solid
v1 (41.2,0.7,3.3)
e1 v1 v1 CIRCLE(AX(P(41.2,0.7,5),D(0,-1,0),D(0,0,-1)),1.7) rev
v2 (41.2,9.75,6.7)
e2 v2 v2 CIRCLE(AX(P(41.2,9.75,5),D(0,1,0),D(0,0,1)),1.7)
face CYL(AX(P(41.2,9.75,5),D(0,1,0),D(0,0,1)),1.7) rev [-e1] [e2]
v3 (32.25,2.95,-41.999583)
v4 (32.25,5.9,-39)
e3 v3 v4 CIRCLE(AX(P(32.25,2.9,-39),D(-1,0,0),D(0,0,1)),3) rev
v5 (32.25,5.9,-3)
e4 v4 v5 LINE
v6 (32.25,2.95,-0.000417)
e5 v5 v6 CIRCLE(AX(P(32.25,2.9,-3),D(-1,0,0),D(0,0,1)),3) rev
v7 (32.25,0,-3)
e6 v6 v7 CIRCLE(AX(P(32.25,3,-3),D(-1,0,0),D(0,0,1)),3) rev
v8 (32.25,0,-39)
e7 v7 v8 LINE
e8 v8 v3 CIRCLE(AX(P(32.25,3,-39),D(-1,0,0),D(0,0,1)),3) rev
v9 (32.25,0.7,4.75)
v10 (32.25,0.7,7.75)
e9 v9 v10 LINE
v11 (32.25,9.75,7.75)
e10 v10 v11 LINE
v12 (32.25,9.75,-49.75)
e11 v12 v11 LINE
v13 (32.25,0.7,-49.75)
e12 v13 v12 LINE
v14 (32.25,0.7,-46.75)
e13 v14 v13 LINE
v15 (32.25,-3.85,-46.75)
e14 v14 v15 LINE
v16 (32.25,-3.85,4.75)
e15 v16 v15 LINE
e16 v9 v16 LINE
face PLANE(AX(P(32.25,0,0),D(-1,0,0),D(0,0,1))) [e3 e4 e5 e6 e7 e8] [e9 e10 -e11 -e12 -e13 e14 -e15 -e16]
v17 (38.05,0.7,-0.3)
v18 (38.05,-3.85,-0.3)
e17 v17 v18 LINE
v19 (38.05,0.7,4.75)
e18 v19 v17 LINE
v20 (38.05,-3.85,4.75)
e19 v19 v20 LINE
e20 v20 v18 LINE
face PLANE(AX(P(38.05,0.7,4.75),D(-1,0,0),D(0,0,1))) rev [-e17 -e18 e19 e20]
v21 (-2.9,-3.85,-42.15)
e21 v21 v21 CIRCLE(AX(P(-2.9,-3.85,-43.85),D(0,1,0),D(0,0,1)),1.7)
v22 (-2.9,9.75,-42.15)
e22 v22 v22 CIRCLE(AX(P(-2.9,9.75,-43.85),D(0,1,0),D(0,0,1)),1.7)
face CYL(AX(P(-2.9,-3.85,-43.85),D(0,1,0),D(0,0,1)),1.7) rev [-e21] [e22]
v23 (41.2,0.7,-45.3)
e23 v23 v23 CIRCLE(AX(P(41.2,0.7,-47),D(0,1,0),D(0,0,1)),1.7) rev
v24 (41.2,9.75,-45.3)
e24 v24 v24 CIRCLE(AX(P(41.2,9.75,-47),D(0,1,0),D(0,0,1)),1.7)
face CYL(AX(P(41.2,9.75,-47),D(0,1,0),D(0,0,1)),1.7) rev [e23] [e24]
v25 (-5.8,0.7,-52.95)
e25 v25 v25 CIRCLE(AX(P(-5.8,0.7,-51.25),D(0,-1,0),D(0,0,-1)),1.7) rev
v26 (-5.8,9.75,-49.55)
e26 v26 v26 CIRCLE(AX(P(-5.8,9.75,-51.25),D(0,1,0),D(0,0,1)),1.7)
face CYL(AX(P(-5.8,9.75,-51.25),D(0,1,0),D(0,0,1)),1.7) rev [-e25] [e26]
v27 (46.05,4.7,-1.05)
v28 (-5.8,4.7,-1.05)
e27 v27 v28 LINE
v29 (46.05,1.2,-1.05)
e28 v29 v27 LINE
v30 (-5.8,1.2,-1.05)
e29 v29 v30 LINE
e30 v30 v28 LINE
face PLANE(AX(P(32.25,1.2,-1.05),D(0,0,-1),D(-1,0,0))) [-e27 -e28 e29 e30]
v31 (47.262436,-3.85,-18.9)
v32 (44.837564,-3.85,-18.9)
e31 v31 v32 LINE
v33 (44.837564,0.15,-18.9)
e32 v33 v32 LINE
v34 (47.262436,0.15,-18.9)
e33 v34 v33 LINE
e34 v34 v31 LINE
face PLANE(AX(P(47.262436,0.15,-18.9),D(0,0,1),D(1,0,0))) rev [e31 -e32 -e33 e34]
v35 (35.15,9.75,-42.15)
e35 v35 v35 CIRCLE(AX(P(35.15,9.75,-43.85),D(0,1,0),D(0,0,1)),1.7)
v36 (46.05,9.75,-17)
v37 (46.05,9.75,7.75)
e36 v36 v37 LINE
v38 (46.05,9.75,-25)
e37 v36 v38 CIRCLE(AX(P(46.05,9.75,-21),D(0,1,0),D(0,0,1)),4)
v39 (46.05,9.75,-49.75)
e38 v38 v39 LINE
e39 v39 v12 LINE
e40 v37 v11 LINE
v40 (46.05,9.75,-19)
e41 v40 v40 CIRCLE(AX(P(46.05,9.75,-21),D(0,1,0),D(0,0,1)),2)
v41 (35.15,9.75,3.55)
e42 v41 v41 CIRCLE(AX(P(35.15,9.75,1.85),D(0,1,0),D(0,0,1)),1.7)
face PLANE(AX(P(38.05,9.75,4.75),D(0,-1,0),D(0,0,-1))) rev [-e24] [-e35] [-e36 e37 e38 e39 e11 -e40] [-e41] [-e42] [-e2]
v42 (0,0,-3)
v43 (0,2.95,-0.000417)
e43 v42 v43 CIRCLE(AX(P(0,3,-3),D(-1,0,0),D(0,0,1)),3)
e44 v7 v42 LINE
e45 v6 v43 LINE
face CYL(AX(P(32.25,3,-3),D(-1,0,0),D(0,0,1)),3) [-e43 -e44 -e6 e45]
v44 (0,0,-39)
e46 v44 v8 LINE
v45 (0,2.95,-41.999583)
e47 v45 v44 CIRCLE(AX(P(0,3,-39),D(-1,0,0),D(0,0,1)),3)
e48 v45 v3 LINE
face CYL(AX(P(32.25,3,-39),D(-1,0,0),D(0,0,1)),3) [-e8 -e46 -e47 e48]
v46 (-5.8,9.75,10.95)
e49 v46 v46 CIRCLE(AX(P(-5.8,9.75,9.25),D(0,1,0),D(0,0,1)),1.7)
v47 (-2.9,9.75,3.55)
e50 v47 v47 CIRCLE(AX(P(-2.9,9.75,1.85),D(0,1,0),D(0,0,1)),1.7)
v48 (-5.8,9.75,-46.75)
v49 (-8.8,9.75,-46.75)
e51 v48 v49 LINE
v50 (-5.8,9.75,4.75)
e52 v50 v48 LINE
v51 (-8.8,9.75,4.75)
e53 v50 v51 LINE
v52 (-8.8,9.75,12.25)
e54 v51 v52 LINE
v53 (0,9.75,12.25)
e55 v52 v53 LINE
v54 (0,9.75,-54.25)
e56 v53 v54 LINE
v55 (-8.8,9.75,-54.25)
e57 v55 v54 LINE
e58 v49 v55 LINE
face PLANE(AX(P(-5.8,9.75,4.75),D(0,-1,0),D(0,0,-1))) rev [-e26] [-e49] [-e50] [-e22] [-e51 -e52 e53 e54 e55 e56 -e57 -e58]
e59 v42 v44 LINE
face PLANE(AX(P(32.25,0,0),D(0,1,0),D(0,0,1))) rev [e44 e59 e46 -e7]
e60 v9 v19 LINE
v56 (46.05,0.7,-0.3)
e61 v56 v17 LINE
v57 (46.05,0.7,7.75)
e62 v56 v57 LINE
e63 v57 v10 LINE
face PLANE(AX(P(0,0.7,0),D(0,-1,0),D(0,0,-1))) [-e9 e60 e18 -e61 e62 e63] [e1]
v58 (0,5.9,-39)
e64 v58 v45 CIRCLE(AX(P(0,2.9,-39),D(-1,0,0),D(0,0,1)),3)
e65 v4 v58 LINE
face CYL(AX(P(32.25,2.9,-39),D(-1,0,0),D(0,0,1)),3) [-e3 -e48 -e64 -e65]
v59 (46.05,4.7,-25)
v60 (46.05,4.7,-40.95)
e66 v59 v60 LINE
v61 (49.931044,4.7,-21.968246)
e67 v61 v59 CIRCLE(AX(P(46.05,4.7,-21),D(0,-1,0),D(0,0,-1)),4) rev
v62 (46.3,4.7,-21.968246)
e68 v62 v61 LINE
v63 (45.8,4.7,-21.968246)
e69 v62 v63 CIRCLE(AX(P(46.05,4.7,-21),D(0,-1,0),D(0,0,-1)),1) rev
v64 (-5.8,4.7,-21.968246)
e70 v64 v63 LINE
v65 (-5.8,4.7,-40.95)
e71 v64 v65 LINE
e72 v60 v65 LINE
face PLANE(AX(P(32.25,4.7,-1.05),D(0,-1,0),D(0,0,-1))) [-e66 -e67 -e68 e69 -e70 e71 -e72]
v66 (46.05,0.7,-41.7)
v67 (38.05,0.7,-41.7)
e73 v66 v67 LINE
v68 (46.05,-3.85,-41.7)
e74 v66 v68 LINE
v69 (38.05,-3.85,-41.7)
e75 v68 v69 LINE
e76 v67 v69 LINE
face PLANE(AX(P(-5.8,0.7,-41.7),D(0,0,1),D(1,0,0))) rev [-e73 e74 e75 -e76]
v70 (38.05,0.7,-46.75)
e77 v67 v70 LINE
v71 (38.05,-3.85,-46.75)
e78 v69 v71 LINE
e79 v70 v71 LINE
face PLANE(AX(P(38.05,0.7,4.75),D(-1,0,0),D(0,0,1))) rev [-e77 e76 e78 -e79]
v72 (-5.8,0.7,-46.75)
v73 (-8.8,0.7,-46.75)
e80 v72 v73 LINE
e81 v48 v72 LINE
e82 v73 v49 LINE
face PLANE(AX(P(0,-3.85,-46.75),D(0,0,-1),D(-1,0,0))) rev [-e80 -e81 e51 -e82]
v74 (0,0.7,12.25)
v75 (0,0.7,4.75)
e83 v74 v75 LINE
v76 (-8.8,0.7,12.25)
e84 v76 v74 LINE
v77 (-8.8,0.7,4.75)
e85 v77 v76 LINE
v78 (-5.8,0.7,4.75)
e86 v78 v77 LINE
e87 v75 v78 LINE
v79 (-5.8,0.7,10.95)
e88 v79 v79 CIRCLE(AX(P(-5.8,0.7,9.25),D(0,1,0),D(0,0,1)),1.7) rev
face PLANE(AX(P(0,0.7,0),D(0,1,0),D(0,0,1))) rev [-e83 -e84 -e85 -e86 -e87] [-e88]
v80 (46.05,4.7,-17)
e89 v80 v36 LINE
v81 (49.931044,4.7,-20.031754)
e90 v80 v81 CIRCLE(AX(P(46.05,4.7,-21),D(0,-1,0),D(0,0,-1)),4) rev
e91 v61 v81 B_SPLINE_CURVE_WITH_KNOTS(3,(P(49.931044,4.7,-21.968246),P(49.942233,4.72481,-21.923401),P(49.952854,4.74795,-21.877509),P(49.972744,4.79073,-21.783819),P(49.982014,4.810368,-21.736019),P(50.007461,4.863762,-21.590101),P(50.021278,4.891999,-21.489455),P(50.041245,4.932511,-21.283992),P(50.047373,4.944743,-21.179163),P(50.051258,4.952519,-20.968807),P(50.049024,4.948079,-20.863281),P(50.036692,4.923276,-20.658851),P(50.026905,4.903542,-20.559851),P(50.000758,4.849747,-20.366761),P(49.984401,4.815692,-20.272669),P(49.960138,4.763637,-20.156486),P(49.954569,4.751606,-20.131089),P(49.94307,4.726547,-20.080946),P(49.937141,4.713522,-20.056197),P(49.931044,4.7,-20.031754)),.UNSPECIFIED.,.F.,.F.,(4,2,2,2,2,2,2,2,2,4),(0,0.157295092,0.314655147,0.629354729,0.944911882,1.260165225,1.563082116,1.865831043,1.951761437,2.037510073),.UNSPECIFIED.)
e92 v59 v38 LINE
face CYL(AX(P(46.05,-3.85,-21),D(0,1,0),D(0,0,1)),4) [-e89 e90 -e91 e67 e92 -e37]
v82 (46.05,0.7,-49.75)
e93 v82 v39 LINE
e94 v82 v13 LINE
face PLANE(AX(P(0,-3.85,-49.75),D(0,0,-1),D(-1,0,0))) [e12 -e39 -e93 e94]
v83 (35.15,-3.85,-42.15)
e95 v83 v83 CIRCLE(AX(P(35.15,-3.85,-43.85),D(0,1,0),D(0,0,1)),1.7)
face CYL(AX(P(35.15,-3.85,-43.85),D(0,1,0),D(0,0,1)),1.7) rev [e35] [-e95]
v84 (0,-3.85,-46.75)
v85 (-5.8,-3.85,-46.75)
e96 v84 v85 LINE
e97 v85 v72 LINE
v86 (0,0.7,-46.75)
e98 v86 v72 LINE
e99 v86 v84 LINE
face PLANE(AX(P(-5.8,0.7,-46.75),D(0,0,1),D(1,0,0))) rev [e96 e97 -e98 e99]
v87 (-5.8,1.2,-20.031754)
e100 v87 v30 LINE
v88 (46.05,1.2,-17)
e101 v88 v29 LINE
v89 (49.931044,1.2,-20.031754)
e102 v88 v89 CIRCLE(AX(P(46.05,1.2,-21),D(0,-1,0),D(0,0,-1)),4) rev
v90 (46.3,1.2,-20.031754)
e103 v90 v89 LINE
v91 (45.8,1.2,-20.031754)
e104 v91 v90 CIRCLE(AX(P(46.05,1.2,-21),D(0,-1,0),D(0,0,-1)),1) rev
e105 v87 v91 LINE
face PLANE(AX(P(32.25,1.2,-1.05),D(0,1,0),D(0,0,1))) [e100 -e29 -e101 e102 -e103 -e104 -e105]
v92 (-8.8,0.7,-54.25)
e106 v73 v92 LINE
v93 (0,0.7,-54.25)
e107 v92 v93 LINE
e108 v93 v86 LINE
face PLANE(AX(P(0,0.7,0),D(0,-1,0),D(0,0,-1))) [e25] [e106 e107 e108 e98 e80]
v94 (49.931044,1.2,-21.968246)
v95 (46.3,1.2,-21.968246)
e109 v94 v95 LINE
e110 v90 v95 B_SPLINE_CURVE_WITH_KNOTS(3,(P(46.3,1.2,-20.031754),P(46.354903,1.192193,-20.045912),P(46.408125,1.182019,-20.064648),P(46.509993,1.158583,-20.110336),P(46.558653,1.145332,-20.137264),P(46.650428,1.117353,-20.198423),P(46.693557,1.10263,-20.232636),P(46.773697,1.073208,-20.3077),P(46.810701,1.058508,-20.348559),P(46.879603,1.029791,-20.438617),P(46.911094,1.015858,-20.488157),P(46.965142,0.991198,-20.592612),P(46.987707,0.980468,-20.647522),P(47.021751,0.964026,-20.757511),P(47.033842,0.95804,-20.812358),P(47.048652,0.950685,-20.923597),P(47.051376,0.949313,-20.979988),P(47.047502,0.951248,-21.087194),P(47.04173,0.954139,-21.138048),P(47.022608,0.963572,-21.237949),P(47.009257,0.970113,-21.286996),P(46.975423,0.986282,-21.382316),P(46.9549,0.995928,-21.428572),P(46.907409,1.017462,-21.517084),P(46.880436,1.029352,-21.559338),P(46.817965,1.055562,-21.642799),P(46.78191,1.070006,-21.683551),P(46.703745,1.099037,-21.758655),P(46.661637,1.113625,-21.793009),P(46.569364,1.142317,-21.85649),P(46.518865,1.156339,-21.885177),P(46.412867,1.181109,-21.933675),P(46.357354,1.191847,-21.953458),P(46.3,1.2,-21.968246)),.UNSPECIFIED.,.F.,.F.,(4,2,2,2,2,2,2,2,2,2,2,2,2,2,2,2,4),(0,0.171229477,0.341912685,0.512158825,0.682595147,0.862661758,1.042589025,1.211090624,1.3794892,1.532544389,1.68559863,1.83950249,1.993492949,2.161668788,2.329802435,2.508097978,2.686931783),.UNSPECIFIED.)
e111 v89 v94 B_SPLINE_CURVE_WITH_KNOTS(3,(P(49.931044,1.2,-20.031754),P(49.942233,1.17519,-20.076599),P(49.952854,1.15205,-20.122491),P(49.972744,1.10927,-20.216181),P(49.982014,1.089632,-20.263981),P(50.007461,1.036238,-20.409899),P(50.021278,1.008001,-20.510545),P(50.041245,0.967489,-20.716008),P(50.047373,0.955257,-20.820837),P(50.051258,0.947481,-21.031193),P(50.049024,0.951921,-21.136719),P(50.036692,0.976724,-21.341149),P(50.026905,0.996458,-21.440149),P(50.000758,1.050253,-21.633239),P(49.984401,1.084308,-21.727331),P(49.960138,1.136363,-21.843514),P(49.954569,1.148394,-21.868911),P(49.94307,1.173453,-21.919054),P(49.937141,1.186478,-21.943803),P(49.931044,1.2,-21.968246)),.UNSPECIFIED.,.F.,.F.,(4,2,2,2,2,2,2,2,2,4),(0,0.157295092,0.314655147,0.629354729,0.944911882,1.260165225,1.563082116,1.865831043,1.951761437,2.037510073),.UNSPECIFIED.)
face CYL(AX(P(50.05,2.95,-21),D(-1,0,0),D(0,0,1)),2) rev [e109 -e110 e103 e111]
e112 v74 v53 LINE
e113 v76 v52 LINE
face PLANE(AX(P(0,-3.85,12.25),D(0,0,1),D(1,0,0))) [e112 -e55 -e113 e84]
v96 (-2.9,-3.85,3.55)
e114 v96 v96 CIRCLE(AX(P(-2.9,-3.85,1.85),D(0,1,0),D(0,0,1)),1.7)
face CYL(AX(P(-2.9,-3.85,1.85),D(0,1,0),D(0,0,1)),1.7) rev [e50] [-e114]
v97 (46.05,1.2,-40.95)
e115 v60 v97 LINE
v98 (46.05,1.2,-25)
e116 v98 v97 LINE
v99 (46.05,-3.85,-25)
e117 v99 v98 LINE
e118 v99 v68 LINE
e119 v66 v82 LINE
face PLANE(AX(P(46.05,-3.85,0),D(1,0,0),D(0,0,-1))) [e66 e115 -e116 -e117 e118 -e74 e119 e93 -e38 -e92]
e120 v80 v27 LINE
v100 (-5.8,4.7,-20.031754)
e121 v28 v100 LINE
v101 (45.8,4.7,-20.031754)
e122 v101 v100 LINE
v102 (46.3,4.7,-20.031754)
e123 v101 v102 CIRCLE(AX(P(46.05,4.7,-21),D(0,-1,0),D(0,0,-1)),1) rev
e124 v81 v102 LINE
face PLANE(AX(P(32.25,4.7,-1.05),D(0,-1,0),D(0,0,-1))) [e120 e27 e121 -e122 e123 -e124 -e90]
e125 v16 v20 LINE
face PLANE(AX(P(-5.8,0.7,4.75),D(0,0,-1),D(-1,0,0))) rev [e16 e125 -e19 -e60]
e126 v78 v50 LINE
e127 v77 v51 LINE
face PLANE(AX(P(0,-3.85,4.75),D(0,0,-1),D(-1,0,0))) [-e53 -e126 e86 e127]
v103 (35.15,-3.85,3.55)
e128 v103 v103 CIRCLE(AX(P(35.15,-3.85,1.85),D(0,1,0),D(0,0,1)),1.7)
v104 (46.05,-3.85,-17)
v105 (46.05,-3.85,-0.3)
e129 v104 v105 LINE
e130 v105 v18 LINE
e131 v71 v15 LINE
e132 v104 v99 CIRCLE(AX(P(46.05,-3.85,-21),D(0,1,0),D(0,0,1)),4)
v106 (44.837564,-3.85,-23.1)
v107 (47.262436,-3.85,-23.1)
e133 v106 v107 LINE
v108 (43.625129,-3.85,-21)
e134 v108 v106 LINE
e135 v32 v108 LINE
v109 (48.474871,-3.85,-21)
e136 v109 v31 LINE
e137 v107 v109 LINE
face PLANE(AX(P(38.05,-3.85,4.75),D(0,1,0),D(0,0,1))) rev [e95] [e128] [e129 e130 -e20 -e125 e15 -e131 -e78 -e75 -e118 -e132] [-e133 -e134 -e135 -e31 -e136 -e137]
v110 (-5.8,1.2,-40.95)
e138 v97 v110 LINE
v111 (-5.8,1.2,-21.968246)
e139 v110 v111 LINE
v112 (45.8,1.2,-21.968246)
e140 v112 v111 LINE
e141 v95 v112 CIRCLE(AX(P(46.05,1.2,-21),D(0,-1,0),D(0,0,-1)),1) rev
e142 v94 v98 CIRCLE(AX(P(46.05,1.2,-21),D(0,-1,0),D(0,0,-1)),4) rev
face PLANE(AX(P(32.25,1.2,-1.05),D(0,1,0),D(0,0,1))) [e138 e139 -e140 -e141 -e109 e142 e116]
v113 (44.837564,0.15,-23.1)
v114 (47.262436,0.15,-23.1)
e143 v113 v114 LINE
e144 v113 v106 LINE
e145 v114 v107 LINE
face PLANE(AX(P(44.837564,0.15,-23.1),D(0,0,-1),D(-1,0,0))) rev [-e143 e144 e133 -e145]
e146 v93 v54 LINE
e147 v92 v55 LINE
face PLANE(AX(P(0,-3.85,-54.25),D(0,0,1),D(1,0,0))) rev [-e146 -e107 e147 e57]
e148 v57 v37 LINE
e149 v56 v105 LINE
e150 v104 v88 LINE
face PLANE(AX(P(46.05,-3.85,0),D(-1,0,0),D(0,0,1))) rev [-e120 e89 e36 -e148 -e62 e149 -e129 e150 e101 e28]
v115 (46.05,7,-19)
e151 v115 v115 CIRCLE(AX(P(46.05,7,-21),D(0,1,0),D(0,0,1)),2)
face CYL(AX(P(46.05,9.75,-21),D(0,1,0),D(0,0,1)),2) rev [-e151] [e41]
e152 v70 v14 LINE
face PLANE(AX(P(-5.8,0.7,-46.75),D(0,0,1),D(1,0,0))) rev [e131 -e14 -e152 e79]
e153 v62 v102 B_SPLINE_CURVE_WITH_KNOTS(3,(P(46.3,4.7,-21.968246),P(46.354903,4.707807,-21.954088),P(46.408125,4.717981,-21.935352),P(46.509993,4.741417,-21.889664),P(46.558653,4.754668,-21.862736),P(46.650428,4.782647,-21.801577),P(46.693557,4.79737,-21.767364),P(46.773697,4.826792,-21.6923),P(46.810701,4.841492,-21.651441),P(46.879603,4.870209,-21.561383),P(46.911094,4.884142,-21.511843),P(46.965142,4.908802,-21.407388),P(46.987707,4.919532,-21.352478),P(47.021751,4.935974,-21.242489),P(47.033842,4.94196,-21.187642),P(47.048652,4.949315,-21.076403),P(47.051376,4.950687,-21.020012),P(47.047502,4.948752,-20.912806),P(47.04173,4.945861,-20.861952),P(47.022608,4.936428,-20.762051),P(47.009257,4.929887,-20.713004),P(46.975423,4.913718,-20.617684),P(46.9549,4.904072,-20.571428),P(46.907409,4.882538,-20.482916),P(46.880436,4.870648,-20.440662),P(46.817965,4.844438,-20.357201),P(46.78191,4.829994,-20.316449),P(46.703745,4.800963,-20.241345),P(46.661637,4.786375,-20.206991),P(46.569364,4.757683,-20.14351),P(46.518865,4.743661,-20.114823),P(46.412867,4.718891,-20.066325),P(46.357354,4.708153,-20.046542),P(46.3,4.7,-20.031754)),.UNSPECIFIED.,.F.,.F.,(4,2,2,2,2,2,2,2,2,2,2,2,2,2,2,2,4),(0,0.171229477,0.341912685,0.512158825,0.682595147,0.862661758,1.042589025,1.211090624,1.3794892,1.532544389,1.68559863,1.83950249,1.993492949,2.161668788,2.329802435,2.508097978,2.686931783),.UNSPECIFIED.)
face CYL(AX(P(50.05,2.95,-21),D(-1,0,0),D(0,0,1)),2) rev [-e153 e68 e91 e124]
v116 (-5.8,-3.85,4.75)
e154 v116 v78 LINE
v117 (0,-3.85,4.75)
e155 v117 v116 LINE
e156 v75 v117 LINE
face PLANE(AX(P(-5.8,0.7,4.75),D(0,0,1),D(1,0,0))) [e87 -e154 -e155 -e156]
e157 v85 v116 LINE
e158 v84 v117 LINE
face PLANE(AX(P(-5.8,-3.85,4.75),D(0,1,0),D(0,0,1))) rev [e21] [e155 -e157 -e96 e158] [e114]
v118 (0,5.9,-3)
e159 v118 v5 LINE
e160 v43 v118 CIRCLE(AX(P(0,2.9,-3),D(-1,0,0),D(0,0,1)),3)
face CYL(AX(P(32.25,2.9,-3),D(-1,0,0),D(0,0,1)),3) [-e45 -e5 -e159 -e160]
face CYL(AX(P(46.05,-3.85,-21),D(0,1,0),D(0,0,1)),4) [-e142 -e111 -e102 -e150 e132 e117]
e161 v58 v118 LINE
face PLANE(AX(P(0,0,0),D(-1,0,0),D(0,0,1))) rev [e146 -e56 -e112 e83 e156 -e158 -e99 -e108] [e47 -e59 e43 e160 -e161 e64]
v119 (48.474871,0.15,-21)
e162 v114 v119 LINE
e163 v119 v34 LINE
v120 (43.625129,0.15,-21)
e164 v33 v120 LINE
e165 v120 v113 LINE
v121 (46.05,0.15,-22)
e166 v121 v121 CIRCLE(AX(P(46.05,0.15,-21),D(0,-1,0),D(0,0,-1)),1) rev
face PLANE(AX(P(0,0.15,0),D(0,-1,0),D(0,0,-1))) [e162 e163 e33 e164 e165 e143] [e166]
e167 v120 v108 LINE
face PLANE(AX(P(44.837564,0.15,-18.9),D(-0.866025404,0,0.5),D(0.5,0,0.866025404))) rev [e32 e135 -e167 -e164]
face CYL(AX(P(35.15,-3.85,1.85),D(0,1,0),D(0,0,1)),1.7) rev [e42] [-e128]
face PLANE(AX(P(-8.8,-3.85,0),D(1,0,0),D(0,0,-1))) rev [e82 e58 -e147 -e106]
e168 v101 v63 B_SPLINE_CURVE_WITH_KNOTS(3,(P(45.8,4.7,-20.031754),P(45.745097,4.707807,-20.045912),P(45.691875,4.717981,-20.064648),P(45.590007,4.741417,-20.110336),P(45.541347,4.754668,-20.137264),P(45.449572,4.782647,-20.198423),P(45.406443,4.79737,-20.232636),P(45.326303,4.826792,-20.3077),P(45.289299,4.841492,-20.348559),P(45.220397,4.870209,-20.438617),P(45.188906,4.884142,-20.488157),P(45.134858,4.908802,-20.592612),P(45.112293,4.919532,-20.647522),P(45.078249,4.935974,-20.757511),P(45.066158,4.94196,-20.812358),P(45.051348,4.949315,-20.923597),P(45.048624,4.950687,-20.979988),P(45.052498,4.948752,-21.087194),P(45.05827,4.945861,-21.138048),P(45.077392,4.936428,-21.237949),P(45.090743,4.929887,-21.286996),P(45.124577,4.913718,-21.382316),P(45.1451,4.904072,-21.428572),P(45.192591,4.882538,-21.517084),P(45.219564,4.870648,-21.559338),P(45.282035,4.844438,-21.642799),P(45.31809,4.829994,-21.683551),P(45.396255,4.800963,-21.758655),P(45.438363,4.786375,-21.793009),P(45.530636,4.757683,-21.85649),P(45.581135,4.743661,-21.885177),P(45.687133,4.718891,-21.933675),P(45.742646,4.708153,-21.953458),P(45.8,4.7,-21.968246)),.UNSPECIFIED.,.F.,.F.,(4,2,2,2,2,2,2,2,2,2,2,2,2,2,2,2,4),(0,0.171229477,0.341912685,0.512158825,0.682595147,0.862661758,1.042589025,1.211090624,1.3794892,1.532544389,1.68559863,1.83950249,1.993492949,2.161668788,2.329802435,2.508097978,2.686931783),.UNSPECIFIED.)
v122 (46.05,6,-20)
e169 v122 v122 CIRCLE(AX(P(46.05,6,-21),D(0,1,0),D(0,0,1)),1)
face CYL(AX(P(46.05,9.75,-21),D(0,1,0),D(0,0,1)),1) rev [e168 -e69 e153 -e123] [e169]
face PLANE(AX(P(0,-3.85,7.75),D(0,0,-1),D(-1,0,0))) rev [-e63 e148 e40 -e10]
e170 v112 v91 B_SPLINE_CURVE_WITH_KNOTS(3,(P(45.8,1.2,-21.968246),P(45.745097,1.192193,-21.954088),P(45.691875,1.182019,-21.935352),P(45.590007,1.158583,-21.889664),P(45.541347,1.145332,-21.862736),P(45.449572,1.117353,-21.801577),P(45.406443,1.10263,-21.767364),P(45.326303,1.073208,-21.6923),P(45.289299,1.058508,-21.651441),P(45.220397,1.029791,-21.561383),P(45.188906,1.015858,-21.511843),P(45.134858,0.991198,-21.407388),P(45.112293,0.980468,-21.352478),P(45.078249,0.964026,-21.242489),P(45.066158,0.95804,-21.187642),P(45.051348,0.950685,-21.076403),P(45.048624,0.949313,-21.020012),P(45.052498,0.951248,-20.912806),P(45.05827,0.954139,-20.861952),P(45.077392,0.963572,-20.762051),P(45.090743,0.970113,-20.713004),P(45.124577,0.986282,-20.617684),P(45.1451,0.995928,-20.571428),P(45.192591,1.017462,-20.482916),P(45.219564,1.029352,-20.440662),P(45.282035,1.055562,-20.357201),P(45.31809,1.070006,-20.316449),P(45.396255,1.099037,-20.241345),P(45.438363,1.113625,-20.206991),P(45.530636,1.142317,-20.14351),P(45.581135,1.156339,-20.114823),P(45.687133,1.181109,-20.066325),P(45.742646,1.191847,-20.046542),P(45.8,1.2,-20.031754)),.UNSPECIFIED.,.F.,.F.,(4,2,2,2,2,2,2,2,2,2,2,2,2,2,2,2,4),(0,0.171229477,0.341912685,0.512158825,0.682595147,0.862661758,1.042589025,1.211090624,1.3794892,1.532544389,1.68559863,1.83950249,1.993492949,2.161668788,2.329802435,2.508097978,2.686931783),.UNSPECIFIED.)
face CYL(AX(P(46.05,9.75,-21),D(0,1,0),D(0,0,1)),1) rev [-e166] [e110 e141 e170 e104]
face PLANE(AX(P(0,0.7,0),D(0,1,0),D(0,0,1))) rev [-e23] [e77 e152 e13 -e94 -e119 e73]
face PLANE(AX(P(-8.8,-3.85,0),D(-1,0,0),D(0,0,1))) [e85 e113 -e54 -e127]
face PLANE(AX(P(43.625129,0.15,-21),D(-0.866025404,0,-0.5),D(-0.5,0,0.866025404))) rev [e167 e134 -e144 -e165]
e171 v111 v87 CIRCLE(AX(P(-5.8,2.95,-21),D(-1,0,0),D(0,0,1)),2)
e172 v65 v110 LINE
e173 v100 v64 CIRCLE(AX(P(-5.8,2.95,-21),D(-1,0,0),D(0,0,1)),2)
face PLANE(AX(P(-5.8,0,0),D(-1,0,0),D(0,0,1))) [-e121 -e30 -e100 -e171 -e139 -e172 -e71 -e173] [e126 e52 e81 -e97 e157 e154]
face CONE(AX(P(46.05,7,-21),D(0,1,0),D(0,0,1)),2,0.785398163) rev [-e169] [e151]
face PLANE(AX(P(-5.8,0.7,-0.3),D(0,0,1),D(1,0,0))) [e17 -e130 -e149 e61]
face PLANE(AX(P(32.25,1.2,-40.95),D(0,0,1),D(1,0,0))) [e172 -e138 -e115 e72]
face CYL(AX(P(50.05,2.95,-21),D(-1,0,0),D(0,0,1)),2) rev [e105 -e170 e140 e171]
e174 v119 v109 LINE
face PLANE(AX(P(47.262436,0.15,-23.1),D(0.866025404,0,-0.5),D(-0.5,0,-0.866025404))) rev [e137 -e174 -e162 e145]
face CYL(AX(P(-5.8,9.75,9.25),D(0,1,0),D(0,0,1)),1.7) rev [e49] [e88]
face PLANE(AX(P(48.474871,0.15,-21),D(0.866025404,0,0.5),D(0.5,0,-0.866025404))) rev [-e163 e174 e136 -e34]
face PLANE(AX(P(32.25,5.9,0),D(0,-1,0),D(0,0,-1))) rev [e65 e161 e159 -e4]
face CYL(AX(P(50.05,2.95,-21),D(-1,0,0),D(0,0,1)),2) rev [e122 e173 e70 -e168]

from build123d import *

# Parameters (mm, degrees)
SKETCH1_W              = 42
SKETCH1_H              = 5.9
SKETCH1_W_2            = 39.9
SKETCH1_H_2            = 3.5
BOSS_EXTRUDE1_DEPTH    = 32.25
FILLET2_R              = 3
SKETCH2_W              = 51.5
SKETCH2_H              = 13.6
SKETCH2_W_2            = 39.9
SKETCH2_H_2            = 3.5
BOSS_EXTRUDE2_DEPTH    = 5.8
SKETCH3_W              = 51.5
SKETCH3_H              = 13.6
SKETCH3_W_2            = 39.9
SKETCH3_H_2            = 3.5
BOSS_EXTRUDE3_DEPTH    = 5.8
SKETCH4_R              = 1.7
CUT_EXTRUDE1_DEPTH     = 62.792596644
SKETCH8_W              = 8.8
SKETCH8_H              = 7.5
BOSS_EXTRUDE4_DEPTH    = 13.6
CUT_EXTRUDE4_DEPTH     = 4
SKETCH15_W             = 39.9
SKETCH15_H             = 3.5
CUT_EXTRUDE5_DEPTH     = 79.468767672
SKETCH17_R             = 2
CUT_EXTRUDE6_DEPTH     = 79.468767672
M3_CLEARANCE_HOLE1_D   = 3.4
CUT_EXTRUDE8_START     = -13.6
CUT_EXTRUDE8_OUTLINE_W = 8.8
CUT_EXTRUDE8_OUTLINE_H = 7.5
CUT_EXTRUDE8_OUTLINE_R = 1.7
CUT_EXTRUDE8_DEPTH     = 4.55


# Read off the part's stored shape, not the designer's step: Cut-Extrude8
with BuildPart() as part:
    # Sketch1 → Boss-Extrude1 (new body)
    with BuildSketch(Plane(origin=(0, 0, 0), x_dir=(0, 0, -1), z_dir=(1, 0, 0))):
        with Locations((21, 2.95)):
            Rectangle(SKETCH1_W, SKETCH1_H)
        with Locations((21, 2.95)):
            Rectangle(SKETCH1_W_2, SKETCH1_H_2, mode=Mode.SUBTRACT)
    extrude(amount=BOSS_EXTRUDE1_DEPTH)

    # Fillet2
    # the kernel refuses this fillet: 3 mm, written as the material it takes off along each edge
    with BuildSketch(Plane(origin=(-7.5, 0, -42), x_dir=(0, 0, 1), z_dir=(1, 0, 0)), Plane(origin=(-7.5, 5.9, 0), x_dir=(0, 0, -1), z_dir=(1, 0, 0)), Plane(origin=(-7.5, 5.9, -42), x_dir=(0, -1, 0), z_dir=(1, 0, 0))) as fillet2_piece_1:
        with BuildLine():
            CenterArc((FILLET2_R, -FILLET2_R), FILLET2_R, 90, 90)
            Line((0, -FILLET2_R), (0, 0))
            Line((0, 0), (FILLET2_R, 0))
        make_face()
    extrude(amount=47.25, mode=Mode.SUBTRACT)
    with BuildSketch(Plane(origin=(-7.5, 0, 0), x_dir=(0, 0, -1), z_dir=(1, 0, 0))) as fillet2_piece_2:
        with BuildLine():
            CenterArc((FILLET2_R, FILLET2_R), FILLET2_R, 180, 90)
            Line((0, FILLET2_R), (0, 0))
            Line((0, 0), (FILLET2_R, 0))
        make_face()
    extrude(amount=47.25, mode=Mode.SUBTRACT)

    # Sketch2 → Boss-Extrude2 (add)
    with BuildSketch(Plane(origin=(32.25, 0, 0), x_dir=(0, 0, -1), z_dir=(1, 0, 0))):
        with Locations((21, 2.95)):
            Rectangle(SKETCH2_W, SKETCH2_H)
        with Locations((21, 2.95)):
            Rectangle(SKETCH2_W_2, SKETCH2_H_2, mode=Mode.SUBTRACT)
    extrude(amount=BOSS_EXTRUDE2_DEPTH)

    # Sketch3 → Boss-Extrude3 (add)
    with BuildSketch(Plane.ZY):
        with Locations((-21, 2.95)):
            Rectangle(SKETCH3_W, SKETCH3_H)
        with Locations((-21, 2.95)):
            Rectangle(SKETCH3_W_2, SKETCH3_H_2, mode=Mode.SUBTRACT)
    extrude(amount=BOSS_EXTRUDE3_DEPTH)

    # Sketch4 → Cut-Extrude1 (cut, through all)
    with BuildSketch(Plane(origin=(0, 9.75, 0), x_dir=(1, 0, 0), z_dir=(0, 1, 0))):
        with Locations(Location((-2.9, 43.85, 0), (0, 0, 270))):
            Circle(SKETCH4_R)
        with Locations(Location((35.15, 43.85, 0), (0, 0, 270))):
            Circle(SKETCH4_R)
        with Locations(Location((-2.9, -1.85, 0), (0, 0, 270))):
            Circle(SKETCH4_R)
        with Locations(Location((35.15, -1.85, 0), (0, 0, 270))):
            Circle(SKETCH4_R)
    extrude(amount=-CUT_EXTRUDE1_DEPTH, mode=Mode.SUBTRACT)

    # Sketch8 → Boss-Extrude4 (add)
    with BuildSketch(Plane(origin=(0, 9.75, 0), x_dir=(1, 0, 0), z_dir=(0, 1, 0))):
        with Locations((-4.4, 50.5)):
            Rectangle(SKETCH8_W, SKETCH8_H)
        with Locations((-4.4, -8.5)):
            Rectangle(SKETCH8_W, SKETCH8_H)
        with BuildLine():
            Line((46.05, 25), (46.05, 49.75))
            Line((46.05, 49.75), (32.25, 49.75))
            Line((32.25, 49.75), (32.25, 46.75))
            Line((32.25, 46.75), (38.05, 46.75))
            Line((38.05, 46.75), (38.05, -4.75))
            Line((38.05, -4.75), (32.25, -4.75))
            Line((32.25, -4.75), (32.25, -7.75))
            Line((32.25, -7.75), (46.05, -7.75))
            Line((46.05, -7.75), (46.05, 17))
            ThreePointArc((46.05, 17), (50.05, 21), (46.05, 25))
        make_face()
    extrude(amount=-BOSS_EXTRUDE4_DEPTH)

    # Sketch13 → CSK for M2 Flat Head Machine Screw1 (revolve, cut)
    with BuildSketch(Plane(origin=(46.05, 9.75, -21), x_dir=(0, 0, 1), z_dir=(1, 0, 0))):
        Polygon((0, 0), (0, 13.6), (1, 13.6), (1, 3.75), (2, 2.75), (2, 0), align=None)
    revolve(axis=Axis((46.05, 16.1, -21), (0, -1, 0)), mode=Mode.SUBTRACT)

    # Sketch14 → Cut-Extrude4 (cut)
    with BuildSketch(Plane.XZ.offset(3.85)):
        Polygon((43.625128869, -21), (44.837564435, -23.1), (47.262435565, -23.1), (48.474871131, -21), (47.262435565, -18.9), (44.837564435, -18.9), align=None)
    extrude(amount=-CUT_EXTRUDE4_DEPTH, mode=Mode.SUBTRACT)

    # Sketch15 → Cut-Extrude5 (cut, through all)
    with BuildSketch(Plane.ZY.offset(5.8)):
        with Locations((-21, 2.95)):
            Rectangle(SKETCH15_W, SKETCH15_H)
    extrude(amount=-CUT_EXTRUDE5_DEPTH, mode=Mode.SUBTRACT)

    # Sketch17 → Cut-Extrude6 (cut, through all)
    with BuildSketch(Plane.ZY.offset(5.8)):
        with Locations((-21, 2.95)):
            Circle(SKETCH17_R)
    extrude(amount=-CUT_EXTRUDE6_DEPTH, mode=Mode.SUBTRACT)

    # M3 Clearance Hole1 (through all)
    with Locations(Plane(origin=(-5.8, 9.75, -51.25), x_dir=(0, 0, 1), z_dir=(0, 1, 0))):
        with Locations((0, 0), (4.25, 47), (56.25, 47), (60.5, 0)):
            Hole(M3_CLEARANCE_HOLE1_D / 2)

    # Cut-Extrude8 outline → Cut-Extrude8 (cut)
    # profile 1 of 4: a face of its own
    with BuildSketch(Plane(origin=(0, 9.75, 0), x_dir=(1, 0, 0), z_dir=(0, 1, 0)).offset(CUT_EXTRUDE8_START)):
        with Locations((-4.4, 50.5)):
            Rectangle(CUT_EXTRUDE8_OUTLINE_W, CUT_EXTRUDE8_OUTLINE_H)
        with Locations((-5.8, 51.25)):
            Circle(CUT_EXTRUDE8_OUTLINE_R, mode=Mode.SUBTRACT)
    # profile 2 of 4: a face of its own
    with BuildSketch(Plane(origin=(0, 9.75, 0), x_dir=(1, 0, 0), z_dir=(0, 1, 0)).offset(CUT_EXTRUDE8_START)):
        with Locations((-4.4, -8.5)):
            Rectangle(CUT_EXTRUDE8_OUTLINE_W, CUT_EXTRUDE8_OUTLINE_H)
        with Locations((-5.8, -9.25)):
            Circle(CUT_EXTRUDE8_OUTLINE_R, mode=Mode.SUBTRACT)
    # profile 3 of 4: a face of its own
    with BuildSketch(Plane(origin=(0, 9.75, 0), x_dir=(1, 0, 0), z_dir=(0, 1, 0)).offset(CUT_EXTRUDE8_START)):
        Polygon((32.25, 49.75), (32.25, 46.75), (38.05, 46.75), (38.05, 41.7), (46.05, 41.7), (46.05, 49.75), align=None)
        with Locations((41.2, 47)):
            Circle(CUT_EXTRUDE8_OUTLINE_R, mode=Mode.SUBTRACT)
    # profile 4 of 4: a face of its own
    with BuildSketch(Plane(origin=(0, 9.75, 0), x_dir=(1, 0, 0), z_dir=(0, 1, 0)).offset(CUT_EXTRUDE8_START)):
        Polygon((38.05, -4.75), (32.25, -4.75), (32.25, -7.75), (46.05, -7.75), (46.05, 0.3), (38.05, 0.3), align=None)
        with Locations((41.2, -5)):
            Circle(CUT_EXTRUDE8_OUTLINE_R, mode=Mode.SUBTRACT)
    extrude(amount=CUT_EXTRUDE8_DEPTH, mode=Mode.SUBTRACT)


solid = part.part
